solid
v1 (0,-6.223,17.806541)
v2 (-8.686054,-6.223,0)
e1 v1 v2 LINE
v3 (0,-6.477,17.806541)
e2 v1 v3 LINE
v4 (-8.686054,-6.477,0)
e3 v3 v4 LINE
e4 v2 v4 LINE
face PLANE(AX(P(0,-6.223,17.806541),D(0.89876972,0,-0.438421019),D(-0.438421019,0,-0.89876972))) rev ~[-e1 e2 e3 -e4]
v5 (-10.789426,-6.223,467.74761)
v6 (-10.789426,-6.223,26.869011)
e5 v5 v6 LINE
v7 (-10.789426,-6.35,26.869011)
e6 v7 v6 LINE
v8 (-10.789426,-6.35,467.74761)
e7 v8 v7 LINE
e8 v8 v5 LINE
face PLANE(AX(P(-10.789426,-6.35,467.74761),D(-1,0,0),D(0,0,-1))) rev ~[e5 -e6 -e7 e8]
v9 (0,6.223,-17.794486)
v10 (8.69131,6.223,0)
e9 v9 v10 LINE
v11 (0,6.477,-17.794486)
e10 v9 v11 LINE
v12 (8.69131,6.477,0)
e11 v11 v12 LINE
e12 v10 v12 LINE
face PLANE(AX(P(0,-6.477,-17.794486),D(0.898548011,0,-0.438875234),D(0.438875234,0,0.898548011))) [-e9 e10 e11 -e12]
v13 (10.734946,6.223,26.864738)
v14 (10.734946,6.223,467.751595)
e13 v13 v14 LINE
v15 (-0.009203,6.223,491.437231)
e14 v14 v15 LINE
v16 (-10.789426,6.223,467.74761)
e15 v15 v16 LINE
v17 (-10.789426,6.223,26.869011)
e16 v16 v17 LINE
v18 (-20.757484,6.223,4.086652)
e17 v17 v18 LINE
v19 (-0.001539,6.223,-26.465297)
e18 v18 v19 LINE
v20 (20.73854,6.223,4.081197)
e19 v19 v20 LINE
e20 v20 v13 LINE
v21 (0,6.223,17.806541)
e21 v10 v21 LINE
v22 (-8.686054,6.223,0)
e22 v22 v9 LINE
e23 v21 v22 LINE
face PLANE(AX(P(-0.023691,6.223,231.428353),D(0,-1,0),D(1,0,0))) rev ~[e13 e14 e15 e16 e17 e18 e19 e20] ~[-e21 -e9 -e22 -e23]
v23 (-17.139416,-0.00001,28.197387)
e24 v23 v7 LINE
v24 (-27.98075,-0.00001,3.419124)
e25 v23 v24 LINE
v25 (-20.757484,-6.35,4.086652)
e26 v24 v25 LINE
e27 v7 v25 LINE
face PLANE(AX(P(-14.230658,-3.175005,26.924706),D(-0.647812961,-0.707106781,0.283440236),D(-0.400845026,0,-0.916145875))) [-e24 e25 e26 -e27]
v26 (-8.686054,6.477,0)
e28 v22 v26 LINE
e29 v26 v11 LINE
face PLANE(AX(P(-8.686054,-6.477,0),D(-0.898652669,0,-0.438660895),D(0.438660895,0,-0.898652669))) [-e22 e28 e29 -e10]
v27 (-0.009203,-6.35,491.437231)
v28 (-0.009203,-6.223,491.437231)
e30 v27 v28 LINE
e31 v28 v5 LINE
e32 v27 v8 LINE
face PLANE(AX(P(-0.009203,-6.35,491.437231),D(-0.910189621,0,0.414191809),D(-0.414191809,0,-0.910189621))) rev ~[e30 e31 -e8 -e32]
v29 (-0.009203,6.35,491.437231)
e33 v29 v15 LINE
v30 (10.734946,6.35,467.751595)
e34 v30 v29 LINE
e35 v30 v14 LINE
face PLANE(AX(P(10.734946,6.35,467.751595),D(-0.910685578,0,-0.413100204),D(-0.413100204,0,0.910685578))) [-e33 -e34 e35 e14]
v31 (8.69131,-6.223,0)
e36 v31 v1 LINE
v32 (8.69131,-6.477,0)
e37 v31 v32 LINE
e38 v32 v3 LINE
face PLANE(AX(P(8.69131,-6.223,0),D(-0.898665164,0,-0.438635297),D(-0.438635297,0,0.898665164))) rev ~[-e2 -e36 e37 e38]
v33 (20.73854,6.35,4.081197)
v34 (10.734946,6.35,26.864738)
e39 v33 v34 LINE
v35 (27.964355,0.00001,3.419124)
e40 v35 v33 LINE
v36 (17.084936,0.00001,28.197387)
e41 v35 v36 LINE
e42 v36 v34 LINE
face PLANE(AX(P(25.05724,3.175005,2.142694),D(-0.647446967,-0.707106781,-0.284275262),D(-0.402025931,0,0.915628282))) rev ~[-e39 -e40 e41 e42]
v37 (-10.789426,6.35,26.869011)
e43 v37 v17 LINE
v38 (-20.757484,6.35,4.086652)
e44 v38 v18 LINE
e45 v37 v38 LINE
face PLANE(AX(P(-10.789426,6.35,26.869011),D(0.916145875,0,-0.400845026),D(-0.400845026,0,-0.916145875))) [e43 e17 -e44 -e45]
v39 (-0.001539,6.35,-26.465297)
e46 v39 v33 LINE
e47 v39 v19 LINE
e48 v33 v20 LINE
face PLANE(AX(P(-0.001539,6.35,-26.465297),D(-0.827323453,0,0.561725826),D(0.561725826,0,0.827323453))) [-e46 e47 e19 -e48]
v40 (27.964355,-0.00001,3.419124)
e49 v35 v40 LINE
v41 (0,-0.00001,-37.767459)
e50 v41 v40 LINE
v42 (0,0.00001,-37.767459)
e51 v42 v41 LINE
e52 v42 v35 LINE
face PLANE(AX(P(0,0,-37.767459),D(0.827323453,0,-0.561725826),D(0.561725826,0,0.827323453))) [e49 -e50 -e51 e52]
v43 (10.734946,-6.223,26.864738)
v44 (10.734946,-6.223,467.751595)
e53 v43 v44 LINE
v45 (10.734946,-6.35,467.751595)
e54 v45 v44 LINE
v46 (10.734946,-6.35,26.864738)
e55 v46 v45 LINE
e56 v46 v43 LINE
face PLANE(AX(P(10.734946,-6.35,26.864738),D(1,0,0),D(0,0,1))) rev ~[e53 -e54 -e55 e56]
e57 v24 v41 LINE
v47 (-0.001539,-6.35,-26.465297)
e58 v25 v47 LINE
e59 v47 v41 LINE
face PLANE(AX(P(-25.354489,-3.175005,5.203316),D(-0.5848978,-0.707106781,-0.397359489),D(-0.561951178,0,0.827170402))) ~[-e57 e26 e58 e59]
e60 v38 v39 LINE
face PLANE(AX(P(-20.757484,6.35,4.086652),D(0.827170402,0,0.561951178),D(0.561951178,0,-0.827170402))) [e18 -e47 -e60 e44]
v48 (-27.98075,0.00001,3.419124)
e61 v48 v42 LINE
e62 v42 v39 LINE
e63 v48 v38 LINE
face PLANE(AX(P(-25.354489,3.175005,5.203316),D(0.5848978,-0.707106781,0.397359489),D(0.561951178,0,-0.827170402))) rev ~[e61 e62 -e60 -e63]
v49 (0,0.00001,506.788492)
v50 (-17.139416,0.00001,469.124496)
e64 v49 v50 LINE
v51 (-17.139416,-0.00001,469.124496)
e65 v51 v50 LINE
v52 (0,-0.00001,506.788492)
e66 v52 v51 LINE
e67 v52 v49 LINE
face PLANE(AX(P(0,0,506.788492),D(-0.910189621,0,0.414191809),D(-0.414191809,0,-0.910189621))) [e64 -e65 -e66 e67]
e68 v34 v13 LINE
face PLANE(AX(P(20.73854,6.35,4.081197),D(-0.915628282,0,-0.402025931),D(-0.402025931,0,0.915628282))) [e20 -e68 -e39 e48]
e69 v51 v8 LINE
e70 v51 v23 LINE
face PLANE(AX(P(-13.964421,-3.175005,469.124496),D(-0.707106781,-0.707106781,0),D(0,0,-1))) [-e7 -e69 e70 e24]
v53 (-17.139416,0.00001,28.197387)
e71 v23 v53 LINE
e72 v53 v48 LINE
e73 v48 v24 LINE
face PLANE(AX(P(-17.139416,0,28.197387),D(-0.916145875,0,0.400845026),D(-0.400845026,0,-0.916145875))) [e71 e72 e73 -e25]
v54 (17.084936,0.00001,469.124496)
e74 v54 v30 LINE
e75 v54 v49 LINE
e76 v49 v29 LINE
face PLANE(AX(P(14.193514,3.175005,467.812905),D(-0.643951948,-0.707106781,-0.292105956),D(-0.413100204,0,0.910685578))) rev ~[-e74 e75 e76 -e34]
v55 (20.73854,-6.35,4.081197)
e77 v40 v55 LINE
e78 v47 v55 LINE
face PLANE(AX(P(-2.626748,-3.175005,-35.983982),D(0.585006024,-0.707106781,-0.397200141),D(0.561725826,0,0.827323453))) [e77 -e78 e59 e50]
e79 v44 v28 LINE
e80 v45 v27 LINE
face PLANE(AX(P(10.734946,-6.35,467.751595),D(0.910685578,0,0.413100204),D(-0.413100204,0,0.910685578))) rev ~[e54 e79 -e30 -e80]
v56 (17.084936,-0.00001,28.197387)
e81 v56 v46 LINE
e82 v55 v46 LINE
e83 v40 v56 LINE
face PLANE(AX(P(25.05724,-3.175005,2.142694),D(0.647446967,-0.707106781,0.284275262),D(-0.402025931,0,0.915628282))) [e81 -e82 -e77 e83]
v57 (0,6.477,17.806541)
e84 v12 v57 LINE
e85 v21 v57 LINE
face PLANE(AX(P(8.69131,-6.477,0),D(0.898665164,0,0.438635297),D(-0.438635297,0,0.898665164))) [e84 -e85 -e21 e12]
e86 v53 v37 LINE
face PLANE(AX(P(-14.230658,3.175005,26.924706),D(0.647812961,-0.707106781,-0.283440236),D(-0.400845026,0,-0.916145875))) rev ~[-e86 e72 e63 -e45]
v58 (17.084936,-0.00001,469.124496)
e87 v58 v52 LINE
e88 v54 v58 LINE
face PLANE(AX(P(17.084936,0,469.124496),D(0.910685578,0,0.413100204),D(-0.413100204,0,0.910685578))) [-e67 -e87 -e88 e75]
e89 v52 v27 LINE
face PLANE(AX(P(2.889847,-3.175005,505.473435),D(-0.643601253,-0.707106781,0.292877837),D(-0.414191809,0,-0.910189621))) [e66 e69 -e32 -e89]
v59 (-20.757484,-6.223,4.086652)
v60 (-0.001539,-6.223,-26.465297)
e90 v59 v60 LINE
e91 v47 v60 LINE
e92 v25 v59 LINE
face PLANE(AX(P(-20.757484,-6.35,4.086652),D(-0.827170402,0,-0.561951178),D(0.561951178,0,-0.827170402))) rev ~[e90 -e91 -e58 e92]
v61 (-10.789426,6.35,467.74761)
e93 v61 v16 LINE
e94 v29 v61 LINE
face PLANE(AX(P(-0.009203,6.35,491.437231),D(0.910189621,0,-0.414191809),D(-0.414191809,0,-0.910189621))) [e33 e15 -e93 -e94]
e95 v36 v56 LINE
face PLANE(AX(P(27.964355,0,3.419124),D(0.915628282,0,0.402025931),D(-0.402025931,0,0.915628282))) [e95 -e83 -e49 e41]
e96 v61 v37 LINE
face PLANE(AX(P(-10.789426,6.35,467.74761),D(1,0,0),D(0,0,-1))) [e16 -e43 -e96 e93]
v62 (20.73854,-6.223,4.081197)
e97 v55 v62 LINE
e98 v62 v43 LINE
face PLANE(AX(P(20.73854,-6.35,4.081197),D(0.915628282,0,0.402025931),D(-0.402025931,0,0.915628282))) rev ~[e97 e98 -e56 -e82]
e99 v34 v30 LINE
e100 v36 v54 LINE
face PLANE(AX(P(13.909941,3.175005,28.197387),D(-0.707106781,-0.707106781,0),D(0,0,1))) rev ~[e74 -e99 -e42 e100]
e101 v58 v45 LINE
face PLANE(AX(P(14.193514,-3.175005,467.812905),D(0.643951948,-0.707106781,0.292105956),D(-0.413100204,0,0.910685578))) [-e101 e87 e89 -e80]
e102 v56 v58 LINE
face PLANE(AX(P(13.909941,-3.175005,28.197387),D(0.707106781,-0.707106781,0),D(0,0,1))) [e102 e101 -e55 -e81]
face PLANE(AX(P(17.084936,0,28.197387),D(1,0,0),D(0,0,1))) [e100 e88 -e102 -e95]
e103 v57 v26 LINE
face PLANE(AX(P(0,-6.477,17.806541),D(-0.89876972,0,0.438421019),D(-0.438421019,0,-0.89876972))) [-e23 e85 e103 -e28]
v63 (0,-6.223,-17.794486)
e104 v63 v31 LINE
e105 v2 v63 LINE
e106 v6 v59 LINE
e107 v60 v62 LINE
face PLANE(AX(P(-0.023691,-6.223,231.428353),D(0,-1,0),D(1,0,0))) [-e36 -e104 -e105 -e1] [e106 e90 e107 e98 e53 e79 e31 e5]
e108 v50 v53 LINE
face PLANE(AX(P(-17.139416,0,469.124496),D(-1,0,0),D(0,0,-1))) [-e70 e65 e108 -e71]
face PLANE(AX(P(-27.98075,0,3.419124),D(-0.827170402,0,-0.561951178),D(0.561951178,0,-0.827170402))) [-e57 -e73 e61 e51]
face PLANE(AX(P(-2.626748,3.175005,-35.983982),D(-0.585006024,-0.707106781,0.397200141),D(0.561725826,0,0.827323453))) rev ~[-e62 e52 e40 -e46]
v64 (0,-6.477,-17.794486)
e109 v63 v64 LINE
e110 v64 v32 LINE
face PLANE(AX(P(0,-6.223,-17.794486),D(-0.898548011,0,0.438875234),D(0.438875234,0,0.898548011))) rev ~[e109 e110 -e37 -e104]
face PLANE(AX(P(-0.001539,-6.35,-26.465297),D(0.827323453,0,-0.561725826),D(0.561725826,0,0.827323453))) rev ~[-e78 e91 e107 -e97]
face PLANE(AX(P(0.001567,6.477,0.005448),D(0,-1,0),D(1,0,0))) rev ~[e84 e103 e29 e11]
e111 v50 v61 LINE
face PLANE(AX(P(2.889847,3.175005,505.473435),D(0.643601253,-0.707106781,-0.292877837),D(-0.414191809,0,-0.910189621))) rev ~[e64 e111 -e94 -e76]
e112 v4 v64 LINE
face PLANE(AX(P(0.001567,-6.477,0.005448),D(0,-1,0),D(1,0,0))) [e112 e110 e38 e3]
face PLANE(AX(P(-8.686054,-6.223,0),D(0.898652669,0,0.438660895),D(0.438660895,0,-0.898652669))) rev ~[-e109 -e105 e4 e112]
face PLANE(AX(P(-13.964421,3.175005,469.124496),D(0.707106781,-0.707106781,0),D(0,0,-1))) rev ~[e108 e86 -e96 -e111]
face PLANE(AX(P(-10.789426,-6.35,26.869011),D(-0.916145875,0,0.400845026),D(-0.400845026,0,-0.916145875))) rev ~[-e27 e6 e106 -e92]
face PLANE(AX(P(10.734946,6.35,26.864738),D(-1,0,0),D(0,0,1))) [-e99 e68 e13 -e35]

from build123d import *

# Parameters (mm, degrees)
F1_DEPTH = 6.35
F2_DEPTH = 6.35
F3_SIZE2 = 6.34999
F3_SIZE  = 6.34999
F4_DEPTH = 0.127
F5_DEPTH = 0.127
F7_DEPTH = 0.254
F8_DEPTH = 12.954


# Not quite as in the source:
# - a fillet or chamfer is up to 0.001 mm smaller than in the source, because OpenCascade refuses the exact size


with BuildPart() as f1:
    # F0 (on Front) → F1 (new body)
    with BuildSketch(Plane.XZ):
        Polygon((-17.139416188, 28.1973872334), (-27.9807504267, 3.4191238228), (0, -37.7674587071), (27.964355424, 3.4191238228), (17.08493568, 28.1973872334), (17.08493568, 469.1244959831), (0, 506.7884922028), (-17.139416188, 469.1244959831), align=None)
    extrude(amount=F1_DEPTH)

    # F2 (add): a face of the model
    f2_faces = [f1.faces().sort_by_distance(p)[0] for p in [
        (-0.0248835797, 0, 225.9211420486),
    ]]
    extrude(f2_faces, amount=F2_DEPTH)

    # F3 (size 6.35 and 6.35 in the source; OpenCascade refuses exactly that, so slightly less here)
    f3_edges = [f1.edges().sort_by_distance(p)[0] for p in [
        (-22.560083, -6.35, 15.808256),
        (-13.990375, -6.35, -17.174167),
        (13.982178, -6.35, -17.174167),
        (22.524646, -6.35, 15.808256),
        (17.084936, -6.35, 248.660942),
        (8.542468, -6.35, 487.956494),
        (-8.569708, -6.35, 487.956494),
        (-17.139416, -6.35, 248.660942),
        (-22.560083, 6.35, 15.808256),
        (-13.990375, 6.35, -17.174167),
        (13.982178, 6.35, -17.174167),
        (22.524646, 6.35, 15.808256),
        (17.084936, 6.35, 248.660942),
        (8.542468, 6.35, 487.956494),
        (-8.569708, 6.35, 487.956494),
        (-17.139416, 6.35, 248.660942),
    ]]
    chamfer(f3_edges, length=F3_SIZE, length2=F3_SIZE2)

    # F4 (cut): a face of the model
    f4_faces = [f1.faces().sort_by_distance(p)[0] for p in [
        (-0.0252861091, -6.35, 223.0026633937),
    ]]
    extrude(f4_faces, amount=-F4_DEPTH, mode=Mode.SUBTRACT)

    # F5 (cut): a face of the model
    f5_faces = [f1.faces().sort_by_distance(p)[0] for p in [
        (-0.0252861091, 6.35, 223.0026633937),
    ]]
    extrude(f5_faces, amount=-F5_DEPTH, mode=Mode.SUBTRACT)

    # F6 (on face) → F7 (join)
    with BuildSketch(Plane.XZ.offset(6.223)):
        Polygon((8.6913099512, 0), (0, 17.8065411747), (-8.6860535666, 0), (0, -17.7944861352), align=None)
    extrude(amount=F7_DEPTH)

    # F8 (add): a face of the model
    f8_faces = [f1.faces().sort_by_distance(p)[0] for p in [
        (0.0017521282, -6.477, 0.0040183465),
    ]]
    extrude(f8_faces, amount=-F8_DEPTH)


solid = f1.part
